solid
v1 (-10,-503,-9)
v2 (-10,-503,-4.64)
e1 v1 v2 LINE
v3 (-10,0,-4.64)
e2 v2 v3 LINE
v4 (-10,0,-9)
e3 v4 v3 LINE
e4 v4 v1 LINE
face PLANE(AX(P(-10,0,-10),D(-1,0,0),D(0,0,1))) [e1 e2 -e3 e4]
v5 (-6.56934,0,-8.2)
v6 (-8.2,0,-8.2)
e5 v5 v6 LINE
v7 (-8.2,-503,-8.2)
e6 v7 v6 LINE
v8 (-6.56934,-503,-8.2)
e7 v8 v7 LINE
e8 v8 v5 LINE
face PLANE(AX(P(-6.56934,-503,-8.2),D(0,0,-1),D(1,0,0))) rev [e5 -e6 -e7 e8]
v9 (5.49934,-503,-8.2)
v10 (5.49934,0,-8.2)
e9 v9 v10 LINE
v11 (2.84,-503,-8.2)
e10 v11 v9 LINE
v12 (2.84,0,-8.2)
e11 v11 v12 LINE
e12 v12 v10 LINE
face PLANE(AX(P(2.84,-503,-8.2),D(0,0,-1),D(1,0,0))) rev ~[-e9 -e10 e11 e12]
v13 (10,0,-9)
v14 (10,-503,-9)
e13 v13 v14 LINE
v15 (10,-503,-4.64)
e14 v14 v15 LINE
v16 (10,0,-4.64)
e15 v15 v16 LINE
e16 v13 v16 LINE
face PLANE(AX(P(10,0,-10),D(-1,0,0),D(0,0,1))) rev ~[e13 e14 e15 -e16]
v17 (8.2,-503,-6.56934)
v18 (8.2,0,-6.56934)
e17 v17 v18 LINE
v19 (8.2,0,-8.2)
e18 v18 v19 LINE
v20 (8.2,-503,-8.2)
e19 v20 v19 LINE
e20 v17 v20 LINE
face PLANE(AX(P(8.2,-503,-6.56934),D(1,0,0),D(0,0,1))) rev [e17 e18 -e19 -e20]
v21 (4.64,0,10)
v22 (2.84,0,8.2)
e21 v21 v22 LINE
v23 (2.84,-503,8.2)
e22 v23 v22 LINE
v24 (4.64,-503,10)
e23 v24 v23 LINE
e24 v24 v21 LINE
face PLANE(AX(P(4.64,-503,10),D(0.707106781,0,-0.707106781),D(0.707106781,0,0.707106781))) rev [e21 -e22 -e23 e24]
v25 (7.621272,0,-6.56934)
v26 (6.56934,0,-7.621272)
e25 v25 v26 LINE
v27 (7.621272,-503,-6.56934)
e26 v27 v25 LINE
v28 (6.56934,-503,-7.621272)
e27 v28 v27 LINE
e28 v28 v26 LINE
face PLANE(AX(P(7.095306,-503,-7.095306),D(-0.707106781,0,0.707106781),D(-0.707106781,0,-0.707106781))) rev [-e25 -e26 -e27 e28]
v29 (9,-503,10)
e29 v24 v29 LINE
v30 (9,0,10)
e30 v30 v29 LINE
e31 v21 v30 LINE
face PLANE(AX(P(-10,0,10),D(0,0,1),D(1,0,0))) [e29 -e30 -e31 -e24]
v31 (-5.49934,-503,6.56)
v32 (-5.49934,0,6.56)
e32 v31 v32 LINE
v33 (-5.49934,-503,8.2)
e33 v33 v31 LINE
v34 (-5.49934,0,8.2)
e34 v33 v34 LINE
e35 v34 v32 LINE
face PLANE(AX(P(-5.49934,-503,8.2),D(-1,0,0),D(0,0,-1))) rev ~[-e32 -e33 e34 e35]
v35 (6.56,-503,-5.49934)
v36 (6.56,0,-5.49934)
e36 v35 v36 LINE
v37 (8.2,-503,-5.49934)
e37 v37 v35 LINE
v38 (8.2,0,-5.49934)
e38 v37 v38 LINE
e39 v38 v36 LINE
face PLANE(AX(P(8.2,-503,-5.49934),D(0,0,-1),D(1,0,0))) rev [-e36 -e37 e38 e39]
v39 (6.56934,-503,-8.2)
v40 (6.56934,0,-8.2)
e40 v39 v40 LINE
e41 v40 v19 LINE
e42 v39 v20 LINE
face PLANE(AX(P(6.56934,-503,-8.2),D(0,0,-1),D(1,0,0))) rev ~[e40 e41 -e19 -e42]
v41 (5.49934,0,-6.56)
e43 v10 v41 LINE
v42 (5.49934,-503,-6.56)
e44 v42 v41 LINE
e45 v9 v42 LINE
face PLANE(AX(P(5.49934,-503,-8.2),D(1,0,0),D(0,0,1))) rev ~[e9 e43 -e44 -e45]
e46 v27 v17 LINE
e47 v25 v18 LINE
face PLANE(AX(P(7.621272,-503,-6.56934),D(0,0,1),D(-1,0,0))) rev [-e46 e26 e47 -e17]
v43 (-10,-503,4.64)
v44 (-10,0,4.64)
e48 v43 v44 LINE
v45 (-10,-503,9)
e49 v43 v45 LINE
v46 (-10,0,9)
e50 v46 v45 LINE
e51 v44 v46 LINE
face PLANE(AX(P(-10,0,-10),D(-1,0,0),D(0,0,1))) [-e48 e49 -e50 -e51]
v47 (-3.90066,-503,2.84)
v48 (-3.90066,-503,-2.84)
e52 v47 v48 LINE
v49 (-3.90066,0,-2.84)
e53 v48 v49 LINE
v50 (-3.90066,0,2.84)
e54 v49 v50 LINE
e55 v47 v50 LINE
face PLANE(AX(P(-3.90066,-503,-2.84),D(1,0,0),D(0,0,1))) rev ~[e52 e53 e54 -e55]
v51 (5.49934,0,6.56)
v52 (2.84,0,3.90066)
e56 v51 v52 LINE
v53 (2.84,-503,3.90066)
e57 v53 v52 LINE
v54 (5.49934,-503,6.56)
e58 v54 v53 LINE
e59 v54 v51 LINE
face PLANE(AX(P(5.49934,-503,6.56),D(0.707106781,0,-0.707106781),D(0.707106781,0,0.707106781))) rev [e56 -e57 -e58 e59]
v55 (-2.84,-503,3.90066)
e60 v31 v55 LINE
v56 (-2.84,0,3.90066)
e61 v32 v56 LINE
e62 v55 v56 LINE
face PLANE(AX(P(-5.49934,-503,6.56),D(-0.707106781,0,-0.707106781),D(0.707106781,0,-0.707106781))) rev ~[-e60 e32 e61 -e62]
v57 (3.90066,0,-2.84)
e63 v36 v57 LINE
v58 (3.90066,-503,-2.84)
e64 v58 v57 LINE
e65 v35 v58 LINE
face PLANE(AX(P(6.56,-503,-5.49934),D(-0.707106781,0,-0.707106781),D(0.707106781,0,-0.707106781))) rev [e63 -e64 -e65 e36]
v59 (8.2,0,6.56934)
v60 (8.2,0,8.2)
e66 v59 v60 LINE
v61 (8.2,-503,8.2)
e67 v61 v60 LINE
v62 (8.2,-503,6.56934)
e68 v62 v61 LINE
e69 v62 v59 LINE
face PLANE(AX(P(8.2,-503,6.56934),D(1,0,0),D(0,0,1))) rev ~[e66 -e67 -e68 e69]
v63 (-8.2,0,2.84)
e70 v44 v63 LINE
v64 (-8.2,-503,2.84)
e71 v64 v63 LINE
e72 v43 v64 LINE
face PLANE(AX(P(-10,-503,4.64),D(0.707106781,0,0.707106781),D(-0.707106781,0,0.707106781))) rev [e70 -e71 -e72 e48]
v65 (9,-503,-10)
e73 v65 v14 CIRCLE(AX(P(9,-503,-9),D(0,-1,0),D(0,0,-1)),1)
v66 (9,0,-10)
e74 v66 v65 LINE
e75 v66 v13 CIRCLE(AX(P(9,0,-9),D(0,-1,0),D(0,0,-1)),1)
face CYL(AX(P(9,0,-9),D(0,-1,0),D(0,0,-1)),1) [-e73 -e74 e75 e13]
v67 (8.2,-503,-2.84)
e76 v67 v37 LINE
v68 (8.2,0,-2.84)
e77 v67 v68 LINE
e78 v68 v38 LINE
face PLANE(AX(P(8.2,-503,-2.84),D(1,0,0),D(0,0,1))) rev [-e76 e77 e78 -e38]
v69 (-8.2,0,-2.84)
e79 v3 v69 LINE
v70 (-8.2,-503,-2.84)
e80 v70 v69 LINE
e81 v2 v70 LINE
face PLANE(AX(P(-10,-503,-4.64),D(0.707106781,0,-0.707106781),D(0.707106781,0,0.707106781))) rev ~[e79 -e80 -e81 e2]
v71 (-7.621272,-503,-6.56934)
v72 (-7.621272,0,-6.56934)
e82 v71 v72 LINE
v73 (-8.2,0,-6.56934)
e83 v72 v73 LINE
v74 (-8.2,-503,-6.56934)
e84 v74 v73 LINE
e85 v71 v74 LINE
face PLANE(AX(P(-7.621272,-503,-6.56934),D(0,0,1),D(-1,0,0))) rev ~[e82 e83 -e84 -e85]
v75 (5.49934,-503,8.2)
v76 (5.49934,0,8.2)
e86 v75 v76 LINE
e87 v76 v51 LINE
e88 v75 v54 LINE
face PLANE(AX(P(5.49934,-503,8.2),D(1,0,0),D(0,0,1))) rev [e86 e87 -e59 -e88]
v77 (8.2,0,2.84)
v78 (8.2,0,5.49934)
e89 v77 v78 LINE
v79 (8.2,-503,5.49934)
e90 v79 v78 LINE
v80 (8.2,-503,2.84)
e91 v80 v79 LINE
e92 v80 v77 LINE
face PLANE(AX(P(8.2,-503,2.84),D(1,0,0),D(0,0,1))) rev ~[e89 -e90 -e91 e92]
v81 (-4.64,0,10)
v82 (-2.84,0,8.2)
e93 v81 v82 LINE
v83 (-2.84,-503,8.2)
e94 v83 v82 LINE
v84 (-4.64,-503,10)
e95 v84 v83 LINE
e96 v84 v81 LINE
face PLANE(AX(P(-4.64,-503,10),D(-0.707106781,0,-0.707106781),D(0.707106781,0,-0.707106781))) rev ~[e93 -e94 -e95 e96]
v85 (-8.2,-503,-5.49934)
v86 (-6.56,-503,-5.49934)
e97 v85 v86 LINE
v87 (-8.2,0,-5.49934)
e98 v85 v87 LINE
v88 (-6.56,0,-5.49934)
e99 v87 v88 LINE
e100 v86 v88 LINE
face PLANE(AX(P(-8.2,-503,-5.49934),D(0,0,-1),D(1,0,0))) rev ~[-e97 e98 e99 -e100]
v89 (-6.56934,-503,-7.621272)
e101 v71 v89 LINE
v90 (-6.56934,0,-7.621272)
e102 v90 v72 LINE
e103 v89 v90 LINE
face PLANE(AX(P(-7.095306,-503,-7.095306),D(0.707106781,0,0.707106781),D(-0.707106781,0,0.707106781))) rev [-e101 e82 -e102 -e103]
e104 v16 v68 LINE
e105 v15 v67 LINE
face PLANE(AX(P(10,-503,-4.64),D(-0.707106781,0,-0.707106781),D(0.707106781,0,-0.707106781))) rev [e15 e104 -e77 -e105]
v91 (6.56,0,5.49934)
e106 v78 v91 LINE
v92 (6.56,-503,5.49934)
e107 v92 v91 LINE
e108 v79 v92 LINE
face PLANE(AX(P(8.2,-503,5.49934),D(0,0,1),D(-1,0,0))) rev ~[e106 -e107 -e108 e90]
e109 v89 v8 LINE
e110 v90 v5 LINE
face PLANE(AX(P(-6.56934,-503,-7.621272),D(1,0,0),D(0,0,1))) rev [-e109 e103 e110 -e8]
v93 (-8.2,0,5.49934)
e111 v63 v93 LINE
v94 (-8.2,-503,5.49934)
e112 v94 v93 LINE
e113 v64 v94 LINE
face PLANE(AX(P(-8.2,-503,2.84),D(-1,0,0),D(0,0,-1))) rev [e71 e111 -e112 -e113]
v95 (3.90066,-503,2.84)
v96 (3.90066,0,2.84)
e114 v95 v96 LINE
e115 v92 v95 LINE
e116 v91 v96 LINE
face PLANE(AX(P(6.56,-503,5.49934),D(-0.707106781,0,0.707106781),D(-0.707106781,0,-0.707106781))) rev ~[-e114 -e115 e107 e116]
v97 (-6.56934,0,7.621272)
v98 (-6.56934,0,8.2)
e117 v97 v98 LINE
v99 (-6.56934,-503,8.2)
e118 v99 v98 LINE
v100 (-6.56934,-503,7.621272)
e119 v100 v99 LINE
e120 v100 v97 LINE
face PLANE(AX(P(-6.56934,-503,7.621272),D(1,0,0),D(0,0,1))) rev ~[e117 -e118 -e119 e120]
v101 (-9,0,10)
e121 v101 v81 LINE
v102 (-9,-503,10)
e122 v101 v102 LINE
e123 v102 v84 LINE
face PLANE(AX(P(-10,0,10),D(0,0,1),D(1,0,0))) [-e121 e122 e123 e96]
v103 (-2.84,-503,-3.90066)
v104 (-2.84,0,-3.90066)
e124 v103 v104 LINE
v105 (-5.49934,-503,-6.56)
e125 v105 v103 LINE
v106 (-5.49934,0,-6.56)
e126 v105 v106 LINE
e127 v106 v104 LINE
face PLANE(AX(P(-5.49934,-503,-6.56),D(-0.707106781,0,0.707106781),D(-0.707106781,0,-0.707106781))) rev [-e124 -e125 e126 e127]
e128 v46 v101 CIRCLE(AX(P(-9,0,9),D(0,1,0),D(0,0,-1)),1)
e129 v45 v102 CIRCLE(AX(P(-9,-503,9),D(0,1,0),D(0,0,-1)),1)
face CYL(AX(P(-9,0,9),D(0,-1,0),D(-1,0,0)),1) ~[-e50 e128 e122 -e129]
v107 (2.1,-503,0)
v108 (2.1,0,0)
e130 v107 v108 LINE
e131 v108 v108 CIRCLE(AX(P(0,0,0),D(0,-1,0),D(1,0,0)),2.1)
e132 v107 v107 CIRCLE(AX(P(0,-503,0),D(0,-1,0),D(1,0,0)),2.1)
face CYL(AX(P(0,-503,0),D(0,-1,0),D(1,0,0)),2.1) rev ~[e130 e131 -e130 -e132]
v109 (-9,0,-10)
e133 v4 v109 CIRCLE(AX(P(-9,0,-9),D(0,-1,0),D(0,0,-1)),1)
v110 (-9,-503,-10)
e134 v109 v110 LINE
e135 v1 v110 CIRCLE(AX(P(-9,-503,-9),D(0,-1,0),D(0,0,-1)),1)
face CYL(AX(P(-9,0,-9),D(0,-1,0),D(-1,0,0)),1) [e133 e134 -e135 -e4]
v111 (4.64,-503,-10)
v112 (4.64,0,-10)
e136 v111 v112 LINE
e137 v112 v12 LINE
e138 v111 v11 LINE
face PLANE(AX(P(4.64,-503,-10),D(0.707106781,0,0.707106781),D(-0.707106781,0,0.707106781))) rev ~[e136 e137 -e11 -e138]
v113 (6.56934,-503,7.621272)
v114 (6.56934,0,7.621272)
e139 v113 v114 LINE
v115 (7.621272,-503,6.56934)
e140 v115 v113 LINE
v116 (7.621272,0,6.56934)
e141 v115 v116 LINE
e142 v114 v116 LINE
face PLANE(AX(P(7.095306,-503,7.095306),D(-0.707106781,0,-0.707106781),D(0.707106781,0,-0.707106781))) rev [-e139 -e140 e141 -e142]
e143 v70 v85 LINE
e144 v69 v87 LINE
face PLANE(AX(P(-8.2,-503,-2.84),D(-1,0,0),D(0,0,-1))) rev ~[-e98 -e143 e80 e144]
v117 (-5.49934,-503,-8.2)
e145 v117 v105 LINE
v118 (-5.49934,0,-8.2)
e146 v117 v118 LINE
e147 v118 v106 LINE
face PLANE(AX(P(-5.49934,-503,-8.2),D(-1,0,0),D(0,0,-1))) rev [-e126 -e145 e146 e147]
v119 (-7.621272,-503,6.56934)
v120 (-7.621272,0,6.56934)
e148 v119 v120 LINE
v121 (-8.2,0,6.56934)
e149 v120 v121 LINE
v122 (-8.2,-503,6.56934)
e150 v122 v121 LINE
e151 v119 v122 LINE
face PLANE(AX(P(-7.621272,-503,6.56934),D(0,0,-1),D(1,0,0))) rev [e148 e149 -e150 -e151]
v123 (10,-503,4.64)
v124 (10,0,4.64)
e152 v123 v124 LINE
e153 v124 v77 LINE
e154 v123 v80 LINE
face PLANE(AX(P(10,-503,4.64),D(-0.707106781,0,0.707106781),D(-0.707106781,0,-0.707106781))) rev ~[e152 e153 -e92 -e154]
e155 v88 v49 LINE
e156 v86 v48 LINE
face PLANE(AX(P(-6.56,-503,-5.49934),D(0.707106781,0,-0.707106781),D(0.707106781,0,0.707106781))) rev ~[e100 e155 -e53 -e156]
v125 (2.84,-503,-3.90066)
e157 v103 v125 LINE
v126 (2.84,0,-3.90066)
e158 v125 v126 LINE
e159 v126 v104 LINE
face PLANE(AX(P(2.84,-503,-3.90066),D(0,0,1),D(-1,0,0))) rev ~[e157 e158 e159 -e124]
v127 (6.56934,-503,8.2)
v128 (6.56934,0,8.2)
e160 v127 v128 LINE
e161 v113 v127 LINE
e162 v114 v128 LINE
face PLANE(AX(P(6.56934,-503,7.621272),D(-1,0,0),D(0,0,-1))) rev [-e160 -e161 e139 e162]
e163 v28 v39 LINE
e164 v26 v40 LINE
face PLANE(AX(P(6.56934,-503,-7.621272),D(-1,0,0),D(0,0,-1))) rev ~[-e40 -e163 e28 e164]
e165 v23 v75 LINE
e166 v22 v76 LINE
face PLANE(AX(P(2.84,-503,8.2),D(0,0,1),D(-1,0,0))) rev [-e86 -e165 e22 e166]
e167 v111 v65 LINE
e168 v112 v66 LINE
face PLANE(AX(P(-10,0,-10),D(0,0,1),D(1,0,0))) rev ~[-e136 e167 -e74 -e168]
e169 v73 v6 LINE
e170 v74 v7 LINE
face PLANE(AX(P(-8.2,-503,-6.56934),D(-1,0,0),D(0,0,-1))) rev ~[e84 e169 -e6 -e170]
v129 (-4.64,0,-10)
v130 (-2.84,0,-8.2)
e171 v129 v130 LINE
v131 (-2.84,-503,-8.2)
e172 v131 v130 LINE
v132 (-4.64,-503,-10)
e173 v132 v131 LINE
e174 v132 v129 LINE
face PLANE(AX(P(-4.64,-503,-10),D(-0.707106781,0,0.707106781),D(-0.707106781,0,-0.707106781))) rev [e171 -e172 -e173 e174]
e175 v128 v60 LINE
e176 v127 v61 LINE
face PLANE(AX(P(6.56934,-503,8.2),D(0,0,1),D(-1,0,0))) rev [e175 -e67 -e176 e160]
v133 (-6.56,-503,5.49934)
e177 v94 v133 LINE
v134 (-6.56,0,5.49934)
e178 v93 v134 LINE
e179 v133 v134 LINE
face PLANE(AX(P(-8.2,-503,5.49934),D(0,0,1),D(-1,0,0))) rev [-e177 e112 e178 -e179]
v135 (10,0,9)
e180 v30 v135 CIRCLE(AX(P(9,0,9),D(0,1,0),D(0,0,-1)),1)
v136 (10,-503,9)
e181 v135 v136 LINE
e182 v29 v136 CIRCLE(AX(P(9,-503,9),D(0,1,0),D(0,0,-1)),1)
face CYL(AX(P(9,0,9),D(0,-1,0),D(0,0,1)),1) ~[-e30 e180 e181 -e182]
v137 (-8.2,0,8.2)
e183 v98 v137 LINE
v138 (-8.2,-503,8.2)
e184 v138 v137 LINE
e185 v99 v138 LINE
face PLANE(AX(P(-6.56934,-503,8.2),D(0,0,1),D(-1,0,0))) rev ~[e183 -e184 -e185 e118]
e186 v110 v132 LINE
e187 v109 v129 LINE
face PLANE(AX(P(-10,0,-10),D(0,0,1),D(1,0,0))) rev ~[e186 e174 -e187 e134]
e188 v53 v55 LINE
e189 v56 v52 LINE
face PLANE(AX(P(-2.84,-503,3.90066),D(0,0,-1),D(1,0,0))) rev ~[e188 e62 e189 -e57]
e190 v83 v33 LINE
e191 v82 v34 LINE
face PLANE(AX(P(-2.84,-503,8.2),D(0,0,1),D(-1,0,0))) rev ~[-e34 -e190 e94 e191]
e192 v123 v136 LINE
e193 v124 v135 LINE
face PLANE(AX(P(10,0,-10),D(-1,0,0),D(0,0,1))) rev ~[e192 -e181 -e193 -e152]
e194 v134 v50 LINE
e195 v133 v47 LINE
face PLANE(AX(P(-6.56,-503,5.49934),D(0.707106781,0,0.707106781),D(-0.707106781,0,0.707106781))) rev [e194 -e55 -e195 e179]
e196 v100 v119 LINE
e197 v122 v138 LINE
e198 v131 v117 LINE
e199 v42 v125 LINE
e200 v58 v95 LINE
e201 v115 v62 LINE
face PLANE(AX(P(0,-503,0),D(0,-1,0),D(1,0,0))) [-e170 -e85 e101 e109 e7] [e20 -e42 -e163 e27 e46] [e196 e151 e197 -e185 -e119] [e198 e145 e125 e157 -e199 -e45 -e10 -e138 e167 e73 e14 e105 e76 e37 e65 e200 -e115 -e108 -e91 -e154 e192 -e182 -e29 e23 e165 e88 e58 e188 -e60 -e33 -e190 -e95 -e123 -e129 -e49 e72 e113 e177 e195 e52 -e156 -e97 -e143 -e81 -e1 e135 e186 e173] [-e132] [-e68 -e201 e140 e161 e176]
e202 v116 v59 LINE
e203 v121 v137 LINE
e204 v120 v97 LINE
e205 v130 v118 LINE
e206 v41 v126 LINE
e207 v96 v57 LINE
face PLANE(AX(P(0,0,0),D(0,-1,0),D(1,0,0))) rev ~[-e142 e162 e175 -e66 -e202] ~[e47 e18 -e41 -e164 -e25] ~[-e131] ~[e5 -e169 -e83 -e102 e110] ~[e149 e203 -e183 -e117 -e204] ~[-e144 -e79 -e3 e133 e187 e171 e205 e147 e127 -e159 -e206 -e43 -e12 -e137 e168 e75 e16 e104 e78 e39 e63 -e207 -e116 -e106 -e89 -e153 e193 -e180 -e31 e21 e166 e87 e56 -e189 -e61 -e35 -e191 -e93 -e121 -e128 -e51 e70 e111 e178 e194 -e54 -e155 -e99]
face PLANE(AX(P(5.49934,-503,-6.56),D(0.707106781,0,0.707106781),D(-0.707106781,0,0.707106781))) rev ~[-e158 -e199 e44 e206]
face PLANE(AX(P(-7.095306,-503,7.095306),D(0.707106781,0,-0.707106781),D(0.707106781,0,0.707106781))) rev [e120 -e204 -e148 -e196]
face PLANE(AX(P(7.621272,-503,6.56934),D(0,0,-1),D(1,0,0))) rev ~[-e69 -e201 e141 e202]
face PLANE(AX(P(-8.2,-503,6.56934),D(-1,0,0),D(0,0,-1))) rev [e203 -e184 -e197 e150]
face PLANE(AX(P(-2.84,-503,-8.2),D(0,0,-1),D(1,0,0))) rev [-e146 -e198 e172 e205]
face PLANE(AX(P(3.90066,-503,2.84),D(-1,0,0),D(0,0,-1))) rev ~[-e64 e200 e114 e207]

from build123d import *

# Parameters (mm, degrees)
F0_W            = 20
F0_H            = 20
F1_DEPTH        = 503
F2_R            = 2.1
F3_DEPTH        = 503.001
F4_R            = 1
F6_DEPTH        = 503.001
F6_COPIES_COUNT = 4


# Not quite as in the source:
# - a pattern or mirror of a feature is missing from the dataset's text; its kind, count and spacing are read off the source's solid


with BuildPart() as f1:
    # F0 (on Front) → F1 (new body)
    with BuildSketch(Plane.XZ):
        Rectangle(F0_W, F0_H)
    extrude(amount=F1_DEPTH)

    # F2 (on face) → F3 (cut, through all)
    with BuildSketch(Plane.XZ.offset(503)):
        Circle(F2_R)
    extrude(amount=-F3_DEPTH, mode=Mode.SUBTRACT)

    # F4
    f4_edges = [f1.edges().sort_by_distance(p)[0] for p in [
        (-10, -251.5, 10),
        (10, -251.5, 10),
        (10, -251.5, -10),
        (-10, -251.5, -10),
    ]]
    fillet(f4_edges, radius=F4_R)

    # F5 (on face) → F6 (cut, through all)
    with BuildSketch(Plane.XZ.offset(503)):
        Polygon((0, 3.9006601718), (0, 10), (-2.84, 10), (-4.64, 10), (-2.84, 8.2), (-5.4993398282, 8.2), (-5.4993398282, 6.56), (-2.84, 3.9006601718), align=None)
        Polygon((-6.5693398282, 8.2), (-8.2, 8.2), (-7.0953059148, 7.0953059148), (-6.5693398282, 7.6212720014), align=None)
    f6 = extrude(amount=-F6_DEPTH, mode=Mode.SUBTRACT)

    # F6_copies: F6 ×4 about axis
    f6_copies_axis = Axis((0, 0, 0), (0, 1, 0))
    for i in range(1, F6_COPIES_COUNT):
        add(f6.rotate(f6_copies_axis, i * 360 / F6_COPIES_COUNT), mode=Mode.SUBTRACT)

    # F6_copies1: F6 across plane
    add(f6.mirror(Plane(origin=(0, 0, 0), x_dir=(-0.7071067812, 0, -0.7071067812), z_dir=(0.7071067812, 0, -0.7071067812))), mode=Mode.SUBTRACT)

    # F6_copies2: F6 across plane
    add(f6.mirror(Plane(origin=(0, 0, 0), x_dir=(-1, 0, 0), z_dir=(0, 0, -1))), mode=Mode.SUBTRACT)

    # F6_copies3: F6 across plane
    add(f6.mirror(Plane(origin=(0, 0, 0), x_dir=(0, 0, 1), z_dir=(1, 0, 0))), mode=Mode.SUBTRACT)

    # F6_copies4: F6 across plane
    add(f6.mirror(Plane(origin=(0, 0, 0), x_dir=(0.7071067812, 0, -0.7071067812), z_dir=(-0.7071067812, 0, -0.7071067812))), mode=Mode.SUBTRACT)


solid = f1.part
